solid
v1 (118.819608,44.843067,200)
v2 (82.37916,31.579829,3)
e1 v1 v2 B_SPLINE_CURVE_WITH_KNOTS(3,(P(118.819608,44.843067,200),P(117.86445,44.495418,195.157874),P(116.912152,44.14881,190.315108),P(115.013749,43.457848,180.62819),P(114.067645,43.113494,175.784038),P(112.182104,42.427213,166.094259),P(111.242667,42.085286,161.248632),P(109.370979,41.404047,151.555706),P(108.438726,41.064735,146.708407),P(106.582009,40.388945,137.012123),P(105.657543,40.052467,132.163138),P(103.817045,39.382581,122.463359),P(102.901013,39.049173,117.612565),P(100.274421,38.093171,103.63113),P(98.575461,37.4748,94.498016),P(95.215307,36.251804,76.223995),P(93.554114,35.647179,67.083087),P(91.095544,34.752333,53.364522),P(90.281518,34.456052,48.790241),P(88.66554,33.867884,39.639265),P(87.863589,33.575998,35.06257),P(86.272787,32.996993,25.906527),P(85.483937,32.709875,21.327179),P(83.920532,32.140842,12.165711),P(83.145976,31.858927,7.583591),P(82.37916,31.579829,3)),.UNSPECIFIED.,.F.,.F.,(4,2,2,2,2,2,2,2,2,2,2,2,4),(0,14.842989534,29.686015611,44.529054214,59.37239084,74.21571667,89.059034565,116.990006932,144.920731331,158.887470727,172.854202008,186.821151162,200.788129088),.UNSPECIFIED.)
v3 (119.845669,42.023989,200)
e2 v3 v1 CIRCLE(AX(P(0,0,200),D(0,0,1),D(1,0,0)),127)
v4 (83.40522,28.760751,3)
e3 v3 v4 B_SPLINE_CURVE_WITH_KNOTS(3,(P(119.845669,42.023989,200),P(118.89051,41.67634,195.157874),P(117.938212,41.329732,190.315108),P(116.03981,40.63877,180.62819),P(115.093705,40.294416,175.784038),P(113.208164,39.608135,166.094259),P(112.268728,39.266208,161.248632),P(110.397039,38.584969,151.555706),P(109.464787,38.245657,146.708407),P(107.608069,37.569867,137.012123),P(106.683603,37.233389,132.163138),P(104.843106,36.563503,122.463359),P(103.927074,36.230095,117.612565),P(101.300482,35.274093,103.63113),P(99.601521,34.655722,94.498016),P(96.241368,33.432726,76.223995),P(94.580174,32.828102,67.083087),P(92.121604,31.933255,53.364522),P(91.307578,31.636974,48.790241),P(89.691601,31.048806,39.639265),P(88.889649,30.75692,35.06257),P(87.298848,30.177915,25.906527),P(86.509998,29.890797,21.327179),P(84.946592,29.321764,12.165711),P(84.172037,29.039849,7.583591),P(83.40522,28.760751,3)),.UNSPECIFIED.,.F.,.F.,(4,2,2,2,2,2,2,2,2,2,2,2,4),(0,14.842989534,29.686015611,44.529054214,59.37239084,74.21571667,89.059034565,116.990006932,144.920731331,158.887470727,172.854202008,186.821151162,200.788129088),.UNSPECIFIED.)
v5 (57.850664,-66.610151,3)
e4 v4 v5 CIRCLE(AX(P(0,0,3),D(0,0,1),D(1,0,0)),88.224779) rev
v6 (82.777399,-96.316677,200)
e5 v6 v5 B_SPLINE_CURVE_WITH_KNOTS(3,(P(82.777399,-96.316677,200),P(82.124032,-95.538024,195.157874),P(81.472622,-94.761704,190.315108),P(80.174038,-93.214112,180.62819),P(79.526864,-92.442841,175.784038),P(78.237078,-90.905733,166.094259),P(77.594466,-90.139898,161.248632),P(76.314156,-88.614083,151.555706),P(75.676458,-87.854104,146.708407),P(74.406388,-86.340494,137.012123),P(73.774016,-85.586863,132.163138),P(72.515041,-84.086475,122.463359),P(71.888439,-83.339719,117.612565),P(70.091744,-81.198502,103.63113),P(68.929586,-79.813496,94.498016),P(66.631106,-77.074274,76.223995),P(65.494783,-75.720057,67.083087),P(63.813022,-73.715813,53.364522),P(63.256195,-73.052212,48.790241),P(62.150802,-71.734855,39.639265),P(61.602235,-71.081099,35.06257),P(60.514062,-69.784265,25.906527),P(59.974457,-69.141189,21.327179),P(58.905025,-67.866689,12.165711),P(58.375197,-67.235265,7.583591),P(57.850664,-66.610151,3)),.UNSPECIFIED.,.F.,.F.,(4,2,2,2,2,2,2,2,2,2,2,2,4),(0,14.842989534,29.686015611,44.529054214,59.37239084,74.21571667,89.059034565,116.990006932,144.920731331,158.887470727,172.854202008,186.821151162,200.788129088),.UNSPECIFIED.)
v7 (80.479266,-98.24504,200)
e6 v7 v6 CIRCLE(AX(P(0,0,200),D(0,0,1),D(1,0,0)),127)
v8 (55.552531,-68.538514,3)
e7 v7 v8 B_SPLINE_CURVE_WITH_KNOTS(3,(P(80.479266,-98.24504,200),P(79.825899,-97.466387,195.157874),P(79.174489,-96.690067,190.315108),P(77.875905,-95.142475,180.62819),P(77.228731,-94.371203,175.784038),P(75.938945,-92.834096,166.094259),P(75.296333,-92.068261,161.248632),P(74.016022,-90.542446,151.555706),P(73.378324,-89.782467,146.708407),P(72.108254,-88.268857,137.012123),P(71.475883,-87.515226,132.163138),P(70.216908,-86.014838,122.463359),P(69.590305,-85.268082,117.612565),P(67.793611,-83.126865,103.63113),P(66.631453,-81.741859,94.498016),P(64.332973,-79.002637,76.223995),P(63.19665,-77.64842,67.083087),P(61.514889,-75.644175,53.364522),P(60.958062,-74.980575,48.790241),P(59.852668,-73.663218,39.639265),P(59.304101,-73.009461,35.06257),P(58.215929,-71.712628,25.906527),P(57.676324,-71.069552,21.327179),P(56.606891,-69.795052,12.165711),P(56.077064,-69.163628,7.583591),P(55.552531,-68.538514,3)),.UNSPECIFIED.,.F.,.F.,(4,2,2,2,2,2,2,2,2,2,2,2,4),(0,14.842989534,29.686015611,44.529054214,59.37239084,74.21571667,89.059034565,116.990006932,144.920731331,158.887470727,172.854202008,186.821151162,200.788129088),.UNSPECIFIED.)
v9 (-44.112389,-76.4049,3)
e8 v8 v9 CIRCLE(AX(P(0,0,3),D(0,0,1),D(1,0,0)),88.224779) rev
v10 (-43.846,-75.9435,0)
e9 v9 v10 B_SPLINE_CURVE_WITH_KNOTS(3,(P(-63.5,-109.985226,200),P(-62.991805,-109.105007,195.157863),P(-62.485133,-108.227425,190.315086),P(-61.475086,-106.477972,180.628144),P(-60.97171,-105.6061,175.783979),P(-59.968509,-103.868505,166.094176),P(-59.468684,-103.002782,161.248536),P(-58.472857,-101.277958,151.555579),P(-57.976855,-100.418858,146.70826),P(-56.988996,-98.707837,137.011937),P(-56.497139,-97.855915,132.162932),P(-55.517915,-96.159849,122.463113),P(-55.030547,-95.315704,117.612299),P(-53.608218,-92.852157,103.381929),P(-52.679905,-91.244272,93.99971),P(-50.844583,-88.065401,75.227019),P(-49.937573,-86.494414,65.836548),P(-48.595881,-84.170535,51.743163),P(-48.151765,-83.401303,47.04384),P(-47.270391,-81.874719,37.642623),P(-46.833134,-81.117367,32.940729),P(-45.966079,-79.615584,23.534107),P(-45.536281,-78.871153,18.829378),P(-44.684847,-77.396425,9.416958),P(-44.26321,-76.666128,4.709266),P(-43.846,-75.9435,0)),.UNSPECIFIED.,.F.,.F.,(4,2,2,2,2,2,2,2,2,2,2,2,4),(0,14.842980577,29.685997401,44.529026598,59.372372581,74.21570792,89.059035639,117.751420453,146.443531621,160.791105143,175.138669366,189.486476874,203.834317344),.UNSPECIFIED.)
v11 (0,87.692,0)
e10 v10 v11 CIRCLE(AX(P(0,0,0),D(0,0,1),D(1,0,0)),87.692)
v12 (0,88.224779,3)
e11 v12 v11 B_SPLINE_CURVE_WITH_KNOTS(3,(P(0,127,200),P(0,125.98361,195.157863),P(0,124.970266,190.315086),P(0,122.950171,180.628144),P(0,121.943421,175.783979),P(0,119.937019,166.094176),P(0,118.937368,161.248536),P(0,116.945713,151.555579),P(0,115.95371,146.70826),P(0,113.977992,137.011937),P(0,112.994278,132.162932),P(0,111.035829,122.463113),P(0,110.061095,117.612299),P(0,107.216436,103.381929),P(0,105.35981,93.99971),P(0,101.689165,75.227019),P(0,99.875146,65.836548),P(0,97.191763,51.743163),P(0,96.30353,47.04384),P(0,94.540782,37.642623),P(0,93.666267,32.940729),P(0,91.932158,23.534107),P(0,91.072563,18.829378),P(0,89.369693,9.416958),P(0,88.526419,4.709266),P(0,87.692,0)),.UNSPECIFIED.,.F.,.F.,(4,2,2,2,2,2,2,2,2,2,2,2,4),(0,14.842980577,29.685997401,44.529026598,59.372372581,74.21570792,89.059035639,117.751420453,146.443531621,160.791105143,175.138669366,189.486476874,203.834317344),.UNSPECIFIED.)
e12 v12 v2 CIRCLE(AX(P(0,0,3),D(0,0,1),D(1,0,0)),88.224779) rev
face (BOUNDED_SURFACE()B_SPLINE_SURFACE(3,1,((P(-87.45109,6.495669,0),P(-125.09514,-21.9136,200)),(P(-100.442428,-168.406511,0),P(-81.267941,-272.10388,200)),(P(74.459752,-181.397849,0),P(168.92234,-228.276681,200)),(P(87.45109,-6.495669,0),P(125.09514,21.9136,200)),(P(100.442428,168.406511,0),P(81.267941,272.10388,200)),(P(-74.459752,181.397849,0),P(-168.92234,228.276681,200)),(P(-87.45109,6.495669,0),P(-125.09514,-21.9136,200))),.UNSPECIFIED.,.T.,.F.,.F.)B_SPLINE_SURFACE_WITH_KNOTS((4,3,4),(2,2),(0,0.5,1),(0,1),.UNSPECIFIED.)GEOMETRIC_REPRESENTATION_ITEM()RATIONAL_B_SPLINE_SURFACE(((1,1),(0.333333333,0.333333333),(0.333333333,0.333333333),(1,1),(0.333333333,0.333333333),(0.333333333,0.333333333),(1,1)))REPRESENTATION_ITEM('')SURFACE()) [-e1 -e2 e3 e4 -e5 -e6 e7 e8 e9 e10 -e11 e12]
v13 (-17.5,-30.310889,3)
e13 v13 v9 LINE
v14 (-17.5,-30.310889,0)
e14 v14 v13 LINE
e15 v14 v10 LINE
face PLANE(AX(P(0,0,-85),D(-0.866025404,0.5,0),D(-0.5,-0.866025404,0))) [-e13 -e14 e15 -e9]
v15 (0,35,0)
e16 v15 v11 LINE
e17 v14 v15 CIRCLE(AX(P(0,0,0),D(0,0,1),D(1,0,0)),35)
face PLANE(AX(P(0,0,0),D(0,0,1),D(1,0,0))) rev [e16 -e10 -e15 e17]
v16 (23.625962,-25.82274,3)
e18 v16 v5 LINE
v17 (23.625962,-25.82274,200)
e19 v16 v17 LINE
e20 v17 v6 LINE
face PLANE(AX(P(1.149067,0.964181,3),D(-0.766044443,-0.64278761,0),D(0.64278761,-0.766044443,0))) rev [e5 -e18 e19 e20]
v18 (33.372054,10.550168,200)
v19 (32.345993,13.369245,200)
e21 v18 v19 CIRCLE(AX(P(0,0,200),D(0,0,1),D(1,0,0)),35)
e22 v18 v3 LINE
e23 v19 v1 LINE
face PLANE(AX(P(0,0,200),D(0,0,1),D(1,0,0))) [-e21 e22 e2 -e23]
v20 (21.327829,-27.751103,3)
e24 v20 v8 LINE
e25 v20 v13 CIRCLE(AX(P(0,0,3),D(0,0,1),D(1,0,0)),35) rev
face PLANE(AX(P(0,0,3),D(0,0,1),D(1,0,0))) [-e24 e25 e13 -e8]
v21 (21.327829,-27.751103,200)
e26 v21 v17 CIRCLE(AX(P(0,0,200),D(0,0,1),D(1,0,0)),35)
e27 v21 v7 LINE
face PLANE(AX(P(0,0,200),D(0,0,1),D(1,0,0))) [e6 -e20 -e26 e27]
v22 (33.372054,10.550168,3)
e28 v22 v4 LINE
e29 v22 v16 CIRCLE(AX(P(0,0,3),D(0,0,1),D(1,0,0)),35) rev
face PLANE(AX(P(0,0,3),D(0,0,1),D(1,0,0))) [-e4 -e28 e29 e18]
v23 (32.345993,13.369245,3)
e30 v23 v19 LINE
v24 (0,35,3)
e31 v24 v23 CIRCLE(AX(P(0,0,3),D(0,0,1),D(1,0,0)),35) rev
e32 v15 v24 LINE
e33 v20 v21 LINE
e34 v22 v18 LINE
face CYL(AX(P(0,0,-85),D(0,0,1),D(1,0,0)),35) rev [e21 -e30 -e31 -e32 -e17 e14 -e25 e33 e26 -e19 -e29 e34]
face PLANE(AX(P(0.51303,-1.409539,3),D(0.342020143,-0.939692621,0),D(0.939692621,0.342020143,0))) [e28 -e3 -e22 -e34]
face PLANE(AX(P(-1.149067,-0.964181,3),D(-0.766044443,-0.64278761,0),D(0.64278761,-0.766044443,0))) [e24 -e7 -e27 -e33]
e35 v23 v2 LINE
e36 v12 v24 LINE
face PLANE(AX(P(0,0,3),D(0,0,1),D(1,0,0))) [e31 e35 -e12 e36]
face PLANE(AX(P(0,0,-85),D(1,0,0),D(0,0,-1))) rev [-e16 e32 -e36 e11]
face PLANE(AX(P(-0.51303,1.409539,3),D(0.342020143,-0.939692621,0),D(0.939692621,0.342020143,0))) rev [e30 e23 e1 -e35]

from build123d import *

# Parameters (mm, degrees)
SKETCH3_R          = 35
CUT_EXTRUDE2_DEPTH = 285
CUT_EXTRUDE3_DEPTH = 197


with BuildPart() as part:
    # Loft1: read off the stored shape, not the designer's step
    # Loft1: loft between two sections, ruled curve by curve
    loft1_from = [
        Edge.make_bspline([(-87.451090027, 6.495669107, 0), (-100.442428241, -168.406510946, 0), (74.459751812, -181.397849161, 0), (87.451090027, -6.495669107, 0), (100.442428241, 168.406510946, 0), (-74.459751812, 181.397849161, 0), (-87.451090027, 6.495669107, 0)], [0, 0, 0, 0, 0.5, 0.5, 0.5, 1, 1, 1, 1], 3, [1, 0.333333333, 0.333333333, 1, 0.333333333, 0.333333333, 1]),
    ]
    loft1_to = [
        Edge.make_bspline([(-125.095140395, -21.913599651, 200), (-81.267941093, -272.10388044, 200), (168.922339696, -228.276681139, 200), (125.095140395, 21.913599651, 200), (81.267941093, 272.10388044, 200), (-168.922339696, 228.276681139, 200), (-125.095140395, -21.913599651, 200)], [0, 0, 0, 0, 0.5, 0.5, 0.5, 1, 1, 1, 1], 3, [1, 0.333333333, 0.333333333, 1, 0.333333333, 0.333333333, 1]),
    ]
    loft1 = Solid(Shell([*[Face.make_surface_from_curves(loft1_from[k], loft1_to[k]) for k in range(1)], Face(Wire(loft1_from)), Face(Wire(loft1_to))]))
    add(loft1)

    # Sketch3 → Cut-Extrude2 (cut)
    with BuildSketch(Plane.XY.offset(200)):
        Circle(SKETCH3_R)
        with BuildLine():
            ThreePointArc((-17.5, -30.310889132), (-33.80740392, 9.058666579), (0, 35))
            Line((0, 35), (0, 127))
            ThreePointArc((0, 127), (-97.242036064, 81.688349366), (-125.095140395, -21.913599651))
            ThreePointArc((-125.095140395, -21.913599651), (-104.072977278, -72.786093456), (-63.5, -109.985226281))
            Line((-63.5, -109.985226281), (-17.5, -30.310889132))
        make_face()
    extrude(amount=-CUT_EXTRUDE2_DEPTH, mode=Mode.SUBTRACT)

    # Sketch4 → Cut-Extrude3 (cut)
    with BuildSketch(Plane.XY.offset(200)):
        with BuildLine():
            Line((0, 127), (0, 35))
            ThreePointArc((0, 35), (19.456058328, 29.09401647), (32.345993225, 13.36924539))
            Line((32.345993225, 13.36924539), (118.819608286, 44.843067322))
            ThreePointArc((118.819608286, 44.843067322), (72.228562391, 104.460685308), (0, 127))
        make_face()
        with BuildLine():
            Line((119.845668716, 42.02398946), (33.372053655, 10.550167528))
            ThreePointArc((33.372053655, 10.550167528), (33.80740392, -9.058666579), (23.625962477, -25.822739921))
            Line((23.625962477, -25.822739921), (82.777398912, -96.316676798))
            ThreePointArc((82.777398912, -96.316676798), (122.672579939, -32.870018728), (119.845668716, 42.02398946))
        make_face()
        with BuildLine():
            Line((80.479265582, -98.245039627), (21.327829148, -27.75110275))
            ThreePointArc((21.327829148, -27.75110275), (2.302432535, -34.924186525), (-17.5, -30.310889132))
            Line((-17.5, -30.310889132), (-63.5, -109.985226281))
            ThreePointArc((-63.5, -109.985226281), (10.321427256, -126.579888369), (80.479265582, -98.245039627))
        make_face()
    extrude(amount=-CUT_EXTRUDE3_DEPTH, mode=Mode.SUBTRACT)


solid = part.part
